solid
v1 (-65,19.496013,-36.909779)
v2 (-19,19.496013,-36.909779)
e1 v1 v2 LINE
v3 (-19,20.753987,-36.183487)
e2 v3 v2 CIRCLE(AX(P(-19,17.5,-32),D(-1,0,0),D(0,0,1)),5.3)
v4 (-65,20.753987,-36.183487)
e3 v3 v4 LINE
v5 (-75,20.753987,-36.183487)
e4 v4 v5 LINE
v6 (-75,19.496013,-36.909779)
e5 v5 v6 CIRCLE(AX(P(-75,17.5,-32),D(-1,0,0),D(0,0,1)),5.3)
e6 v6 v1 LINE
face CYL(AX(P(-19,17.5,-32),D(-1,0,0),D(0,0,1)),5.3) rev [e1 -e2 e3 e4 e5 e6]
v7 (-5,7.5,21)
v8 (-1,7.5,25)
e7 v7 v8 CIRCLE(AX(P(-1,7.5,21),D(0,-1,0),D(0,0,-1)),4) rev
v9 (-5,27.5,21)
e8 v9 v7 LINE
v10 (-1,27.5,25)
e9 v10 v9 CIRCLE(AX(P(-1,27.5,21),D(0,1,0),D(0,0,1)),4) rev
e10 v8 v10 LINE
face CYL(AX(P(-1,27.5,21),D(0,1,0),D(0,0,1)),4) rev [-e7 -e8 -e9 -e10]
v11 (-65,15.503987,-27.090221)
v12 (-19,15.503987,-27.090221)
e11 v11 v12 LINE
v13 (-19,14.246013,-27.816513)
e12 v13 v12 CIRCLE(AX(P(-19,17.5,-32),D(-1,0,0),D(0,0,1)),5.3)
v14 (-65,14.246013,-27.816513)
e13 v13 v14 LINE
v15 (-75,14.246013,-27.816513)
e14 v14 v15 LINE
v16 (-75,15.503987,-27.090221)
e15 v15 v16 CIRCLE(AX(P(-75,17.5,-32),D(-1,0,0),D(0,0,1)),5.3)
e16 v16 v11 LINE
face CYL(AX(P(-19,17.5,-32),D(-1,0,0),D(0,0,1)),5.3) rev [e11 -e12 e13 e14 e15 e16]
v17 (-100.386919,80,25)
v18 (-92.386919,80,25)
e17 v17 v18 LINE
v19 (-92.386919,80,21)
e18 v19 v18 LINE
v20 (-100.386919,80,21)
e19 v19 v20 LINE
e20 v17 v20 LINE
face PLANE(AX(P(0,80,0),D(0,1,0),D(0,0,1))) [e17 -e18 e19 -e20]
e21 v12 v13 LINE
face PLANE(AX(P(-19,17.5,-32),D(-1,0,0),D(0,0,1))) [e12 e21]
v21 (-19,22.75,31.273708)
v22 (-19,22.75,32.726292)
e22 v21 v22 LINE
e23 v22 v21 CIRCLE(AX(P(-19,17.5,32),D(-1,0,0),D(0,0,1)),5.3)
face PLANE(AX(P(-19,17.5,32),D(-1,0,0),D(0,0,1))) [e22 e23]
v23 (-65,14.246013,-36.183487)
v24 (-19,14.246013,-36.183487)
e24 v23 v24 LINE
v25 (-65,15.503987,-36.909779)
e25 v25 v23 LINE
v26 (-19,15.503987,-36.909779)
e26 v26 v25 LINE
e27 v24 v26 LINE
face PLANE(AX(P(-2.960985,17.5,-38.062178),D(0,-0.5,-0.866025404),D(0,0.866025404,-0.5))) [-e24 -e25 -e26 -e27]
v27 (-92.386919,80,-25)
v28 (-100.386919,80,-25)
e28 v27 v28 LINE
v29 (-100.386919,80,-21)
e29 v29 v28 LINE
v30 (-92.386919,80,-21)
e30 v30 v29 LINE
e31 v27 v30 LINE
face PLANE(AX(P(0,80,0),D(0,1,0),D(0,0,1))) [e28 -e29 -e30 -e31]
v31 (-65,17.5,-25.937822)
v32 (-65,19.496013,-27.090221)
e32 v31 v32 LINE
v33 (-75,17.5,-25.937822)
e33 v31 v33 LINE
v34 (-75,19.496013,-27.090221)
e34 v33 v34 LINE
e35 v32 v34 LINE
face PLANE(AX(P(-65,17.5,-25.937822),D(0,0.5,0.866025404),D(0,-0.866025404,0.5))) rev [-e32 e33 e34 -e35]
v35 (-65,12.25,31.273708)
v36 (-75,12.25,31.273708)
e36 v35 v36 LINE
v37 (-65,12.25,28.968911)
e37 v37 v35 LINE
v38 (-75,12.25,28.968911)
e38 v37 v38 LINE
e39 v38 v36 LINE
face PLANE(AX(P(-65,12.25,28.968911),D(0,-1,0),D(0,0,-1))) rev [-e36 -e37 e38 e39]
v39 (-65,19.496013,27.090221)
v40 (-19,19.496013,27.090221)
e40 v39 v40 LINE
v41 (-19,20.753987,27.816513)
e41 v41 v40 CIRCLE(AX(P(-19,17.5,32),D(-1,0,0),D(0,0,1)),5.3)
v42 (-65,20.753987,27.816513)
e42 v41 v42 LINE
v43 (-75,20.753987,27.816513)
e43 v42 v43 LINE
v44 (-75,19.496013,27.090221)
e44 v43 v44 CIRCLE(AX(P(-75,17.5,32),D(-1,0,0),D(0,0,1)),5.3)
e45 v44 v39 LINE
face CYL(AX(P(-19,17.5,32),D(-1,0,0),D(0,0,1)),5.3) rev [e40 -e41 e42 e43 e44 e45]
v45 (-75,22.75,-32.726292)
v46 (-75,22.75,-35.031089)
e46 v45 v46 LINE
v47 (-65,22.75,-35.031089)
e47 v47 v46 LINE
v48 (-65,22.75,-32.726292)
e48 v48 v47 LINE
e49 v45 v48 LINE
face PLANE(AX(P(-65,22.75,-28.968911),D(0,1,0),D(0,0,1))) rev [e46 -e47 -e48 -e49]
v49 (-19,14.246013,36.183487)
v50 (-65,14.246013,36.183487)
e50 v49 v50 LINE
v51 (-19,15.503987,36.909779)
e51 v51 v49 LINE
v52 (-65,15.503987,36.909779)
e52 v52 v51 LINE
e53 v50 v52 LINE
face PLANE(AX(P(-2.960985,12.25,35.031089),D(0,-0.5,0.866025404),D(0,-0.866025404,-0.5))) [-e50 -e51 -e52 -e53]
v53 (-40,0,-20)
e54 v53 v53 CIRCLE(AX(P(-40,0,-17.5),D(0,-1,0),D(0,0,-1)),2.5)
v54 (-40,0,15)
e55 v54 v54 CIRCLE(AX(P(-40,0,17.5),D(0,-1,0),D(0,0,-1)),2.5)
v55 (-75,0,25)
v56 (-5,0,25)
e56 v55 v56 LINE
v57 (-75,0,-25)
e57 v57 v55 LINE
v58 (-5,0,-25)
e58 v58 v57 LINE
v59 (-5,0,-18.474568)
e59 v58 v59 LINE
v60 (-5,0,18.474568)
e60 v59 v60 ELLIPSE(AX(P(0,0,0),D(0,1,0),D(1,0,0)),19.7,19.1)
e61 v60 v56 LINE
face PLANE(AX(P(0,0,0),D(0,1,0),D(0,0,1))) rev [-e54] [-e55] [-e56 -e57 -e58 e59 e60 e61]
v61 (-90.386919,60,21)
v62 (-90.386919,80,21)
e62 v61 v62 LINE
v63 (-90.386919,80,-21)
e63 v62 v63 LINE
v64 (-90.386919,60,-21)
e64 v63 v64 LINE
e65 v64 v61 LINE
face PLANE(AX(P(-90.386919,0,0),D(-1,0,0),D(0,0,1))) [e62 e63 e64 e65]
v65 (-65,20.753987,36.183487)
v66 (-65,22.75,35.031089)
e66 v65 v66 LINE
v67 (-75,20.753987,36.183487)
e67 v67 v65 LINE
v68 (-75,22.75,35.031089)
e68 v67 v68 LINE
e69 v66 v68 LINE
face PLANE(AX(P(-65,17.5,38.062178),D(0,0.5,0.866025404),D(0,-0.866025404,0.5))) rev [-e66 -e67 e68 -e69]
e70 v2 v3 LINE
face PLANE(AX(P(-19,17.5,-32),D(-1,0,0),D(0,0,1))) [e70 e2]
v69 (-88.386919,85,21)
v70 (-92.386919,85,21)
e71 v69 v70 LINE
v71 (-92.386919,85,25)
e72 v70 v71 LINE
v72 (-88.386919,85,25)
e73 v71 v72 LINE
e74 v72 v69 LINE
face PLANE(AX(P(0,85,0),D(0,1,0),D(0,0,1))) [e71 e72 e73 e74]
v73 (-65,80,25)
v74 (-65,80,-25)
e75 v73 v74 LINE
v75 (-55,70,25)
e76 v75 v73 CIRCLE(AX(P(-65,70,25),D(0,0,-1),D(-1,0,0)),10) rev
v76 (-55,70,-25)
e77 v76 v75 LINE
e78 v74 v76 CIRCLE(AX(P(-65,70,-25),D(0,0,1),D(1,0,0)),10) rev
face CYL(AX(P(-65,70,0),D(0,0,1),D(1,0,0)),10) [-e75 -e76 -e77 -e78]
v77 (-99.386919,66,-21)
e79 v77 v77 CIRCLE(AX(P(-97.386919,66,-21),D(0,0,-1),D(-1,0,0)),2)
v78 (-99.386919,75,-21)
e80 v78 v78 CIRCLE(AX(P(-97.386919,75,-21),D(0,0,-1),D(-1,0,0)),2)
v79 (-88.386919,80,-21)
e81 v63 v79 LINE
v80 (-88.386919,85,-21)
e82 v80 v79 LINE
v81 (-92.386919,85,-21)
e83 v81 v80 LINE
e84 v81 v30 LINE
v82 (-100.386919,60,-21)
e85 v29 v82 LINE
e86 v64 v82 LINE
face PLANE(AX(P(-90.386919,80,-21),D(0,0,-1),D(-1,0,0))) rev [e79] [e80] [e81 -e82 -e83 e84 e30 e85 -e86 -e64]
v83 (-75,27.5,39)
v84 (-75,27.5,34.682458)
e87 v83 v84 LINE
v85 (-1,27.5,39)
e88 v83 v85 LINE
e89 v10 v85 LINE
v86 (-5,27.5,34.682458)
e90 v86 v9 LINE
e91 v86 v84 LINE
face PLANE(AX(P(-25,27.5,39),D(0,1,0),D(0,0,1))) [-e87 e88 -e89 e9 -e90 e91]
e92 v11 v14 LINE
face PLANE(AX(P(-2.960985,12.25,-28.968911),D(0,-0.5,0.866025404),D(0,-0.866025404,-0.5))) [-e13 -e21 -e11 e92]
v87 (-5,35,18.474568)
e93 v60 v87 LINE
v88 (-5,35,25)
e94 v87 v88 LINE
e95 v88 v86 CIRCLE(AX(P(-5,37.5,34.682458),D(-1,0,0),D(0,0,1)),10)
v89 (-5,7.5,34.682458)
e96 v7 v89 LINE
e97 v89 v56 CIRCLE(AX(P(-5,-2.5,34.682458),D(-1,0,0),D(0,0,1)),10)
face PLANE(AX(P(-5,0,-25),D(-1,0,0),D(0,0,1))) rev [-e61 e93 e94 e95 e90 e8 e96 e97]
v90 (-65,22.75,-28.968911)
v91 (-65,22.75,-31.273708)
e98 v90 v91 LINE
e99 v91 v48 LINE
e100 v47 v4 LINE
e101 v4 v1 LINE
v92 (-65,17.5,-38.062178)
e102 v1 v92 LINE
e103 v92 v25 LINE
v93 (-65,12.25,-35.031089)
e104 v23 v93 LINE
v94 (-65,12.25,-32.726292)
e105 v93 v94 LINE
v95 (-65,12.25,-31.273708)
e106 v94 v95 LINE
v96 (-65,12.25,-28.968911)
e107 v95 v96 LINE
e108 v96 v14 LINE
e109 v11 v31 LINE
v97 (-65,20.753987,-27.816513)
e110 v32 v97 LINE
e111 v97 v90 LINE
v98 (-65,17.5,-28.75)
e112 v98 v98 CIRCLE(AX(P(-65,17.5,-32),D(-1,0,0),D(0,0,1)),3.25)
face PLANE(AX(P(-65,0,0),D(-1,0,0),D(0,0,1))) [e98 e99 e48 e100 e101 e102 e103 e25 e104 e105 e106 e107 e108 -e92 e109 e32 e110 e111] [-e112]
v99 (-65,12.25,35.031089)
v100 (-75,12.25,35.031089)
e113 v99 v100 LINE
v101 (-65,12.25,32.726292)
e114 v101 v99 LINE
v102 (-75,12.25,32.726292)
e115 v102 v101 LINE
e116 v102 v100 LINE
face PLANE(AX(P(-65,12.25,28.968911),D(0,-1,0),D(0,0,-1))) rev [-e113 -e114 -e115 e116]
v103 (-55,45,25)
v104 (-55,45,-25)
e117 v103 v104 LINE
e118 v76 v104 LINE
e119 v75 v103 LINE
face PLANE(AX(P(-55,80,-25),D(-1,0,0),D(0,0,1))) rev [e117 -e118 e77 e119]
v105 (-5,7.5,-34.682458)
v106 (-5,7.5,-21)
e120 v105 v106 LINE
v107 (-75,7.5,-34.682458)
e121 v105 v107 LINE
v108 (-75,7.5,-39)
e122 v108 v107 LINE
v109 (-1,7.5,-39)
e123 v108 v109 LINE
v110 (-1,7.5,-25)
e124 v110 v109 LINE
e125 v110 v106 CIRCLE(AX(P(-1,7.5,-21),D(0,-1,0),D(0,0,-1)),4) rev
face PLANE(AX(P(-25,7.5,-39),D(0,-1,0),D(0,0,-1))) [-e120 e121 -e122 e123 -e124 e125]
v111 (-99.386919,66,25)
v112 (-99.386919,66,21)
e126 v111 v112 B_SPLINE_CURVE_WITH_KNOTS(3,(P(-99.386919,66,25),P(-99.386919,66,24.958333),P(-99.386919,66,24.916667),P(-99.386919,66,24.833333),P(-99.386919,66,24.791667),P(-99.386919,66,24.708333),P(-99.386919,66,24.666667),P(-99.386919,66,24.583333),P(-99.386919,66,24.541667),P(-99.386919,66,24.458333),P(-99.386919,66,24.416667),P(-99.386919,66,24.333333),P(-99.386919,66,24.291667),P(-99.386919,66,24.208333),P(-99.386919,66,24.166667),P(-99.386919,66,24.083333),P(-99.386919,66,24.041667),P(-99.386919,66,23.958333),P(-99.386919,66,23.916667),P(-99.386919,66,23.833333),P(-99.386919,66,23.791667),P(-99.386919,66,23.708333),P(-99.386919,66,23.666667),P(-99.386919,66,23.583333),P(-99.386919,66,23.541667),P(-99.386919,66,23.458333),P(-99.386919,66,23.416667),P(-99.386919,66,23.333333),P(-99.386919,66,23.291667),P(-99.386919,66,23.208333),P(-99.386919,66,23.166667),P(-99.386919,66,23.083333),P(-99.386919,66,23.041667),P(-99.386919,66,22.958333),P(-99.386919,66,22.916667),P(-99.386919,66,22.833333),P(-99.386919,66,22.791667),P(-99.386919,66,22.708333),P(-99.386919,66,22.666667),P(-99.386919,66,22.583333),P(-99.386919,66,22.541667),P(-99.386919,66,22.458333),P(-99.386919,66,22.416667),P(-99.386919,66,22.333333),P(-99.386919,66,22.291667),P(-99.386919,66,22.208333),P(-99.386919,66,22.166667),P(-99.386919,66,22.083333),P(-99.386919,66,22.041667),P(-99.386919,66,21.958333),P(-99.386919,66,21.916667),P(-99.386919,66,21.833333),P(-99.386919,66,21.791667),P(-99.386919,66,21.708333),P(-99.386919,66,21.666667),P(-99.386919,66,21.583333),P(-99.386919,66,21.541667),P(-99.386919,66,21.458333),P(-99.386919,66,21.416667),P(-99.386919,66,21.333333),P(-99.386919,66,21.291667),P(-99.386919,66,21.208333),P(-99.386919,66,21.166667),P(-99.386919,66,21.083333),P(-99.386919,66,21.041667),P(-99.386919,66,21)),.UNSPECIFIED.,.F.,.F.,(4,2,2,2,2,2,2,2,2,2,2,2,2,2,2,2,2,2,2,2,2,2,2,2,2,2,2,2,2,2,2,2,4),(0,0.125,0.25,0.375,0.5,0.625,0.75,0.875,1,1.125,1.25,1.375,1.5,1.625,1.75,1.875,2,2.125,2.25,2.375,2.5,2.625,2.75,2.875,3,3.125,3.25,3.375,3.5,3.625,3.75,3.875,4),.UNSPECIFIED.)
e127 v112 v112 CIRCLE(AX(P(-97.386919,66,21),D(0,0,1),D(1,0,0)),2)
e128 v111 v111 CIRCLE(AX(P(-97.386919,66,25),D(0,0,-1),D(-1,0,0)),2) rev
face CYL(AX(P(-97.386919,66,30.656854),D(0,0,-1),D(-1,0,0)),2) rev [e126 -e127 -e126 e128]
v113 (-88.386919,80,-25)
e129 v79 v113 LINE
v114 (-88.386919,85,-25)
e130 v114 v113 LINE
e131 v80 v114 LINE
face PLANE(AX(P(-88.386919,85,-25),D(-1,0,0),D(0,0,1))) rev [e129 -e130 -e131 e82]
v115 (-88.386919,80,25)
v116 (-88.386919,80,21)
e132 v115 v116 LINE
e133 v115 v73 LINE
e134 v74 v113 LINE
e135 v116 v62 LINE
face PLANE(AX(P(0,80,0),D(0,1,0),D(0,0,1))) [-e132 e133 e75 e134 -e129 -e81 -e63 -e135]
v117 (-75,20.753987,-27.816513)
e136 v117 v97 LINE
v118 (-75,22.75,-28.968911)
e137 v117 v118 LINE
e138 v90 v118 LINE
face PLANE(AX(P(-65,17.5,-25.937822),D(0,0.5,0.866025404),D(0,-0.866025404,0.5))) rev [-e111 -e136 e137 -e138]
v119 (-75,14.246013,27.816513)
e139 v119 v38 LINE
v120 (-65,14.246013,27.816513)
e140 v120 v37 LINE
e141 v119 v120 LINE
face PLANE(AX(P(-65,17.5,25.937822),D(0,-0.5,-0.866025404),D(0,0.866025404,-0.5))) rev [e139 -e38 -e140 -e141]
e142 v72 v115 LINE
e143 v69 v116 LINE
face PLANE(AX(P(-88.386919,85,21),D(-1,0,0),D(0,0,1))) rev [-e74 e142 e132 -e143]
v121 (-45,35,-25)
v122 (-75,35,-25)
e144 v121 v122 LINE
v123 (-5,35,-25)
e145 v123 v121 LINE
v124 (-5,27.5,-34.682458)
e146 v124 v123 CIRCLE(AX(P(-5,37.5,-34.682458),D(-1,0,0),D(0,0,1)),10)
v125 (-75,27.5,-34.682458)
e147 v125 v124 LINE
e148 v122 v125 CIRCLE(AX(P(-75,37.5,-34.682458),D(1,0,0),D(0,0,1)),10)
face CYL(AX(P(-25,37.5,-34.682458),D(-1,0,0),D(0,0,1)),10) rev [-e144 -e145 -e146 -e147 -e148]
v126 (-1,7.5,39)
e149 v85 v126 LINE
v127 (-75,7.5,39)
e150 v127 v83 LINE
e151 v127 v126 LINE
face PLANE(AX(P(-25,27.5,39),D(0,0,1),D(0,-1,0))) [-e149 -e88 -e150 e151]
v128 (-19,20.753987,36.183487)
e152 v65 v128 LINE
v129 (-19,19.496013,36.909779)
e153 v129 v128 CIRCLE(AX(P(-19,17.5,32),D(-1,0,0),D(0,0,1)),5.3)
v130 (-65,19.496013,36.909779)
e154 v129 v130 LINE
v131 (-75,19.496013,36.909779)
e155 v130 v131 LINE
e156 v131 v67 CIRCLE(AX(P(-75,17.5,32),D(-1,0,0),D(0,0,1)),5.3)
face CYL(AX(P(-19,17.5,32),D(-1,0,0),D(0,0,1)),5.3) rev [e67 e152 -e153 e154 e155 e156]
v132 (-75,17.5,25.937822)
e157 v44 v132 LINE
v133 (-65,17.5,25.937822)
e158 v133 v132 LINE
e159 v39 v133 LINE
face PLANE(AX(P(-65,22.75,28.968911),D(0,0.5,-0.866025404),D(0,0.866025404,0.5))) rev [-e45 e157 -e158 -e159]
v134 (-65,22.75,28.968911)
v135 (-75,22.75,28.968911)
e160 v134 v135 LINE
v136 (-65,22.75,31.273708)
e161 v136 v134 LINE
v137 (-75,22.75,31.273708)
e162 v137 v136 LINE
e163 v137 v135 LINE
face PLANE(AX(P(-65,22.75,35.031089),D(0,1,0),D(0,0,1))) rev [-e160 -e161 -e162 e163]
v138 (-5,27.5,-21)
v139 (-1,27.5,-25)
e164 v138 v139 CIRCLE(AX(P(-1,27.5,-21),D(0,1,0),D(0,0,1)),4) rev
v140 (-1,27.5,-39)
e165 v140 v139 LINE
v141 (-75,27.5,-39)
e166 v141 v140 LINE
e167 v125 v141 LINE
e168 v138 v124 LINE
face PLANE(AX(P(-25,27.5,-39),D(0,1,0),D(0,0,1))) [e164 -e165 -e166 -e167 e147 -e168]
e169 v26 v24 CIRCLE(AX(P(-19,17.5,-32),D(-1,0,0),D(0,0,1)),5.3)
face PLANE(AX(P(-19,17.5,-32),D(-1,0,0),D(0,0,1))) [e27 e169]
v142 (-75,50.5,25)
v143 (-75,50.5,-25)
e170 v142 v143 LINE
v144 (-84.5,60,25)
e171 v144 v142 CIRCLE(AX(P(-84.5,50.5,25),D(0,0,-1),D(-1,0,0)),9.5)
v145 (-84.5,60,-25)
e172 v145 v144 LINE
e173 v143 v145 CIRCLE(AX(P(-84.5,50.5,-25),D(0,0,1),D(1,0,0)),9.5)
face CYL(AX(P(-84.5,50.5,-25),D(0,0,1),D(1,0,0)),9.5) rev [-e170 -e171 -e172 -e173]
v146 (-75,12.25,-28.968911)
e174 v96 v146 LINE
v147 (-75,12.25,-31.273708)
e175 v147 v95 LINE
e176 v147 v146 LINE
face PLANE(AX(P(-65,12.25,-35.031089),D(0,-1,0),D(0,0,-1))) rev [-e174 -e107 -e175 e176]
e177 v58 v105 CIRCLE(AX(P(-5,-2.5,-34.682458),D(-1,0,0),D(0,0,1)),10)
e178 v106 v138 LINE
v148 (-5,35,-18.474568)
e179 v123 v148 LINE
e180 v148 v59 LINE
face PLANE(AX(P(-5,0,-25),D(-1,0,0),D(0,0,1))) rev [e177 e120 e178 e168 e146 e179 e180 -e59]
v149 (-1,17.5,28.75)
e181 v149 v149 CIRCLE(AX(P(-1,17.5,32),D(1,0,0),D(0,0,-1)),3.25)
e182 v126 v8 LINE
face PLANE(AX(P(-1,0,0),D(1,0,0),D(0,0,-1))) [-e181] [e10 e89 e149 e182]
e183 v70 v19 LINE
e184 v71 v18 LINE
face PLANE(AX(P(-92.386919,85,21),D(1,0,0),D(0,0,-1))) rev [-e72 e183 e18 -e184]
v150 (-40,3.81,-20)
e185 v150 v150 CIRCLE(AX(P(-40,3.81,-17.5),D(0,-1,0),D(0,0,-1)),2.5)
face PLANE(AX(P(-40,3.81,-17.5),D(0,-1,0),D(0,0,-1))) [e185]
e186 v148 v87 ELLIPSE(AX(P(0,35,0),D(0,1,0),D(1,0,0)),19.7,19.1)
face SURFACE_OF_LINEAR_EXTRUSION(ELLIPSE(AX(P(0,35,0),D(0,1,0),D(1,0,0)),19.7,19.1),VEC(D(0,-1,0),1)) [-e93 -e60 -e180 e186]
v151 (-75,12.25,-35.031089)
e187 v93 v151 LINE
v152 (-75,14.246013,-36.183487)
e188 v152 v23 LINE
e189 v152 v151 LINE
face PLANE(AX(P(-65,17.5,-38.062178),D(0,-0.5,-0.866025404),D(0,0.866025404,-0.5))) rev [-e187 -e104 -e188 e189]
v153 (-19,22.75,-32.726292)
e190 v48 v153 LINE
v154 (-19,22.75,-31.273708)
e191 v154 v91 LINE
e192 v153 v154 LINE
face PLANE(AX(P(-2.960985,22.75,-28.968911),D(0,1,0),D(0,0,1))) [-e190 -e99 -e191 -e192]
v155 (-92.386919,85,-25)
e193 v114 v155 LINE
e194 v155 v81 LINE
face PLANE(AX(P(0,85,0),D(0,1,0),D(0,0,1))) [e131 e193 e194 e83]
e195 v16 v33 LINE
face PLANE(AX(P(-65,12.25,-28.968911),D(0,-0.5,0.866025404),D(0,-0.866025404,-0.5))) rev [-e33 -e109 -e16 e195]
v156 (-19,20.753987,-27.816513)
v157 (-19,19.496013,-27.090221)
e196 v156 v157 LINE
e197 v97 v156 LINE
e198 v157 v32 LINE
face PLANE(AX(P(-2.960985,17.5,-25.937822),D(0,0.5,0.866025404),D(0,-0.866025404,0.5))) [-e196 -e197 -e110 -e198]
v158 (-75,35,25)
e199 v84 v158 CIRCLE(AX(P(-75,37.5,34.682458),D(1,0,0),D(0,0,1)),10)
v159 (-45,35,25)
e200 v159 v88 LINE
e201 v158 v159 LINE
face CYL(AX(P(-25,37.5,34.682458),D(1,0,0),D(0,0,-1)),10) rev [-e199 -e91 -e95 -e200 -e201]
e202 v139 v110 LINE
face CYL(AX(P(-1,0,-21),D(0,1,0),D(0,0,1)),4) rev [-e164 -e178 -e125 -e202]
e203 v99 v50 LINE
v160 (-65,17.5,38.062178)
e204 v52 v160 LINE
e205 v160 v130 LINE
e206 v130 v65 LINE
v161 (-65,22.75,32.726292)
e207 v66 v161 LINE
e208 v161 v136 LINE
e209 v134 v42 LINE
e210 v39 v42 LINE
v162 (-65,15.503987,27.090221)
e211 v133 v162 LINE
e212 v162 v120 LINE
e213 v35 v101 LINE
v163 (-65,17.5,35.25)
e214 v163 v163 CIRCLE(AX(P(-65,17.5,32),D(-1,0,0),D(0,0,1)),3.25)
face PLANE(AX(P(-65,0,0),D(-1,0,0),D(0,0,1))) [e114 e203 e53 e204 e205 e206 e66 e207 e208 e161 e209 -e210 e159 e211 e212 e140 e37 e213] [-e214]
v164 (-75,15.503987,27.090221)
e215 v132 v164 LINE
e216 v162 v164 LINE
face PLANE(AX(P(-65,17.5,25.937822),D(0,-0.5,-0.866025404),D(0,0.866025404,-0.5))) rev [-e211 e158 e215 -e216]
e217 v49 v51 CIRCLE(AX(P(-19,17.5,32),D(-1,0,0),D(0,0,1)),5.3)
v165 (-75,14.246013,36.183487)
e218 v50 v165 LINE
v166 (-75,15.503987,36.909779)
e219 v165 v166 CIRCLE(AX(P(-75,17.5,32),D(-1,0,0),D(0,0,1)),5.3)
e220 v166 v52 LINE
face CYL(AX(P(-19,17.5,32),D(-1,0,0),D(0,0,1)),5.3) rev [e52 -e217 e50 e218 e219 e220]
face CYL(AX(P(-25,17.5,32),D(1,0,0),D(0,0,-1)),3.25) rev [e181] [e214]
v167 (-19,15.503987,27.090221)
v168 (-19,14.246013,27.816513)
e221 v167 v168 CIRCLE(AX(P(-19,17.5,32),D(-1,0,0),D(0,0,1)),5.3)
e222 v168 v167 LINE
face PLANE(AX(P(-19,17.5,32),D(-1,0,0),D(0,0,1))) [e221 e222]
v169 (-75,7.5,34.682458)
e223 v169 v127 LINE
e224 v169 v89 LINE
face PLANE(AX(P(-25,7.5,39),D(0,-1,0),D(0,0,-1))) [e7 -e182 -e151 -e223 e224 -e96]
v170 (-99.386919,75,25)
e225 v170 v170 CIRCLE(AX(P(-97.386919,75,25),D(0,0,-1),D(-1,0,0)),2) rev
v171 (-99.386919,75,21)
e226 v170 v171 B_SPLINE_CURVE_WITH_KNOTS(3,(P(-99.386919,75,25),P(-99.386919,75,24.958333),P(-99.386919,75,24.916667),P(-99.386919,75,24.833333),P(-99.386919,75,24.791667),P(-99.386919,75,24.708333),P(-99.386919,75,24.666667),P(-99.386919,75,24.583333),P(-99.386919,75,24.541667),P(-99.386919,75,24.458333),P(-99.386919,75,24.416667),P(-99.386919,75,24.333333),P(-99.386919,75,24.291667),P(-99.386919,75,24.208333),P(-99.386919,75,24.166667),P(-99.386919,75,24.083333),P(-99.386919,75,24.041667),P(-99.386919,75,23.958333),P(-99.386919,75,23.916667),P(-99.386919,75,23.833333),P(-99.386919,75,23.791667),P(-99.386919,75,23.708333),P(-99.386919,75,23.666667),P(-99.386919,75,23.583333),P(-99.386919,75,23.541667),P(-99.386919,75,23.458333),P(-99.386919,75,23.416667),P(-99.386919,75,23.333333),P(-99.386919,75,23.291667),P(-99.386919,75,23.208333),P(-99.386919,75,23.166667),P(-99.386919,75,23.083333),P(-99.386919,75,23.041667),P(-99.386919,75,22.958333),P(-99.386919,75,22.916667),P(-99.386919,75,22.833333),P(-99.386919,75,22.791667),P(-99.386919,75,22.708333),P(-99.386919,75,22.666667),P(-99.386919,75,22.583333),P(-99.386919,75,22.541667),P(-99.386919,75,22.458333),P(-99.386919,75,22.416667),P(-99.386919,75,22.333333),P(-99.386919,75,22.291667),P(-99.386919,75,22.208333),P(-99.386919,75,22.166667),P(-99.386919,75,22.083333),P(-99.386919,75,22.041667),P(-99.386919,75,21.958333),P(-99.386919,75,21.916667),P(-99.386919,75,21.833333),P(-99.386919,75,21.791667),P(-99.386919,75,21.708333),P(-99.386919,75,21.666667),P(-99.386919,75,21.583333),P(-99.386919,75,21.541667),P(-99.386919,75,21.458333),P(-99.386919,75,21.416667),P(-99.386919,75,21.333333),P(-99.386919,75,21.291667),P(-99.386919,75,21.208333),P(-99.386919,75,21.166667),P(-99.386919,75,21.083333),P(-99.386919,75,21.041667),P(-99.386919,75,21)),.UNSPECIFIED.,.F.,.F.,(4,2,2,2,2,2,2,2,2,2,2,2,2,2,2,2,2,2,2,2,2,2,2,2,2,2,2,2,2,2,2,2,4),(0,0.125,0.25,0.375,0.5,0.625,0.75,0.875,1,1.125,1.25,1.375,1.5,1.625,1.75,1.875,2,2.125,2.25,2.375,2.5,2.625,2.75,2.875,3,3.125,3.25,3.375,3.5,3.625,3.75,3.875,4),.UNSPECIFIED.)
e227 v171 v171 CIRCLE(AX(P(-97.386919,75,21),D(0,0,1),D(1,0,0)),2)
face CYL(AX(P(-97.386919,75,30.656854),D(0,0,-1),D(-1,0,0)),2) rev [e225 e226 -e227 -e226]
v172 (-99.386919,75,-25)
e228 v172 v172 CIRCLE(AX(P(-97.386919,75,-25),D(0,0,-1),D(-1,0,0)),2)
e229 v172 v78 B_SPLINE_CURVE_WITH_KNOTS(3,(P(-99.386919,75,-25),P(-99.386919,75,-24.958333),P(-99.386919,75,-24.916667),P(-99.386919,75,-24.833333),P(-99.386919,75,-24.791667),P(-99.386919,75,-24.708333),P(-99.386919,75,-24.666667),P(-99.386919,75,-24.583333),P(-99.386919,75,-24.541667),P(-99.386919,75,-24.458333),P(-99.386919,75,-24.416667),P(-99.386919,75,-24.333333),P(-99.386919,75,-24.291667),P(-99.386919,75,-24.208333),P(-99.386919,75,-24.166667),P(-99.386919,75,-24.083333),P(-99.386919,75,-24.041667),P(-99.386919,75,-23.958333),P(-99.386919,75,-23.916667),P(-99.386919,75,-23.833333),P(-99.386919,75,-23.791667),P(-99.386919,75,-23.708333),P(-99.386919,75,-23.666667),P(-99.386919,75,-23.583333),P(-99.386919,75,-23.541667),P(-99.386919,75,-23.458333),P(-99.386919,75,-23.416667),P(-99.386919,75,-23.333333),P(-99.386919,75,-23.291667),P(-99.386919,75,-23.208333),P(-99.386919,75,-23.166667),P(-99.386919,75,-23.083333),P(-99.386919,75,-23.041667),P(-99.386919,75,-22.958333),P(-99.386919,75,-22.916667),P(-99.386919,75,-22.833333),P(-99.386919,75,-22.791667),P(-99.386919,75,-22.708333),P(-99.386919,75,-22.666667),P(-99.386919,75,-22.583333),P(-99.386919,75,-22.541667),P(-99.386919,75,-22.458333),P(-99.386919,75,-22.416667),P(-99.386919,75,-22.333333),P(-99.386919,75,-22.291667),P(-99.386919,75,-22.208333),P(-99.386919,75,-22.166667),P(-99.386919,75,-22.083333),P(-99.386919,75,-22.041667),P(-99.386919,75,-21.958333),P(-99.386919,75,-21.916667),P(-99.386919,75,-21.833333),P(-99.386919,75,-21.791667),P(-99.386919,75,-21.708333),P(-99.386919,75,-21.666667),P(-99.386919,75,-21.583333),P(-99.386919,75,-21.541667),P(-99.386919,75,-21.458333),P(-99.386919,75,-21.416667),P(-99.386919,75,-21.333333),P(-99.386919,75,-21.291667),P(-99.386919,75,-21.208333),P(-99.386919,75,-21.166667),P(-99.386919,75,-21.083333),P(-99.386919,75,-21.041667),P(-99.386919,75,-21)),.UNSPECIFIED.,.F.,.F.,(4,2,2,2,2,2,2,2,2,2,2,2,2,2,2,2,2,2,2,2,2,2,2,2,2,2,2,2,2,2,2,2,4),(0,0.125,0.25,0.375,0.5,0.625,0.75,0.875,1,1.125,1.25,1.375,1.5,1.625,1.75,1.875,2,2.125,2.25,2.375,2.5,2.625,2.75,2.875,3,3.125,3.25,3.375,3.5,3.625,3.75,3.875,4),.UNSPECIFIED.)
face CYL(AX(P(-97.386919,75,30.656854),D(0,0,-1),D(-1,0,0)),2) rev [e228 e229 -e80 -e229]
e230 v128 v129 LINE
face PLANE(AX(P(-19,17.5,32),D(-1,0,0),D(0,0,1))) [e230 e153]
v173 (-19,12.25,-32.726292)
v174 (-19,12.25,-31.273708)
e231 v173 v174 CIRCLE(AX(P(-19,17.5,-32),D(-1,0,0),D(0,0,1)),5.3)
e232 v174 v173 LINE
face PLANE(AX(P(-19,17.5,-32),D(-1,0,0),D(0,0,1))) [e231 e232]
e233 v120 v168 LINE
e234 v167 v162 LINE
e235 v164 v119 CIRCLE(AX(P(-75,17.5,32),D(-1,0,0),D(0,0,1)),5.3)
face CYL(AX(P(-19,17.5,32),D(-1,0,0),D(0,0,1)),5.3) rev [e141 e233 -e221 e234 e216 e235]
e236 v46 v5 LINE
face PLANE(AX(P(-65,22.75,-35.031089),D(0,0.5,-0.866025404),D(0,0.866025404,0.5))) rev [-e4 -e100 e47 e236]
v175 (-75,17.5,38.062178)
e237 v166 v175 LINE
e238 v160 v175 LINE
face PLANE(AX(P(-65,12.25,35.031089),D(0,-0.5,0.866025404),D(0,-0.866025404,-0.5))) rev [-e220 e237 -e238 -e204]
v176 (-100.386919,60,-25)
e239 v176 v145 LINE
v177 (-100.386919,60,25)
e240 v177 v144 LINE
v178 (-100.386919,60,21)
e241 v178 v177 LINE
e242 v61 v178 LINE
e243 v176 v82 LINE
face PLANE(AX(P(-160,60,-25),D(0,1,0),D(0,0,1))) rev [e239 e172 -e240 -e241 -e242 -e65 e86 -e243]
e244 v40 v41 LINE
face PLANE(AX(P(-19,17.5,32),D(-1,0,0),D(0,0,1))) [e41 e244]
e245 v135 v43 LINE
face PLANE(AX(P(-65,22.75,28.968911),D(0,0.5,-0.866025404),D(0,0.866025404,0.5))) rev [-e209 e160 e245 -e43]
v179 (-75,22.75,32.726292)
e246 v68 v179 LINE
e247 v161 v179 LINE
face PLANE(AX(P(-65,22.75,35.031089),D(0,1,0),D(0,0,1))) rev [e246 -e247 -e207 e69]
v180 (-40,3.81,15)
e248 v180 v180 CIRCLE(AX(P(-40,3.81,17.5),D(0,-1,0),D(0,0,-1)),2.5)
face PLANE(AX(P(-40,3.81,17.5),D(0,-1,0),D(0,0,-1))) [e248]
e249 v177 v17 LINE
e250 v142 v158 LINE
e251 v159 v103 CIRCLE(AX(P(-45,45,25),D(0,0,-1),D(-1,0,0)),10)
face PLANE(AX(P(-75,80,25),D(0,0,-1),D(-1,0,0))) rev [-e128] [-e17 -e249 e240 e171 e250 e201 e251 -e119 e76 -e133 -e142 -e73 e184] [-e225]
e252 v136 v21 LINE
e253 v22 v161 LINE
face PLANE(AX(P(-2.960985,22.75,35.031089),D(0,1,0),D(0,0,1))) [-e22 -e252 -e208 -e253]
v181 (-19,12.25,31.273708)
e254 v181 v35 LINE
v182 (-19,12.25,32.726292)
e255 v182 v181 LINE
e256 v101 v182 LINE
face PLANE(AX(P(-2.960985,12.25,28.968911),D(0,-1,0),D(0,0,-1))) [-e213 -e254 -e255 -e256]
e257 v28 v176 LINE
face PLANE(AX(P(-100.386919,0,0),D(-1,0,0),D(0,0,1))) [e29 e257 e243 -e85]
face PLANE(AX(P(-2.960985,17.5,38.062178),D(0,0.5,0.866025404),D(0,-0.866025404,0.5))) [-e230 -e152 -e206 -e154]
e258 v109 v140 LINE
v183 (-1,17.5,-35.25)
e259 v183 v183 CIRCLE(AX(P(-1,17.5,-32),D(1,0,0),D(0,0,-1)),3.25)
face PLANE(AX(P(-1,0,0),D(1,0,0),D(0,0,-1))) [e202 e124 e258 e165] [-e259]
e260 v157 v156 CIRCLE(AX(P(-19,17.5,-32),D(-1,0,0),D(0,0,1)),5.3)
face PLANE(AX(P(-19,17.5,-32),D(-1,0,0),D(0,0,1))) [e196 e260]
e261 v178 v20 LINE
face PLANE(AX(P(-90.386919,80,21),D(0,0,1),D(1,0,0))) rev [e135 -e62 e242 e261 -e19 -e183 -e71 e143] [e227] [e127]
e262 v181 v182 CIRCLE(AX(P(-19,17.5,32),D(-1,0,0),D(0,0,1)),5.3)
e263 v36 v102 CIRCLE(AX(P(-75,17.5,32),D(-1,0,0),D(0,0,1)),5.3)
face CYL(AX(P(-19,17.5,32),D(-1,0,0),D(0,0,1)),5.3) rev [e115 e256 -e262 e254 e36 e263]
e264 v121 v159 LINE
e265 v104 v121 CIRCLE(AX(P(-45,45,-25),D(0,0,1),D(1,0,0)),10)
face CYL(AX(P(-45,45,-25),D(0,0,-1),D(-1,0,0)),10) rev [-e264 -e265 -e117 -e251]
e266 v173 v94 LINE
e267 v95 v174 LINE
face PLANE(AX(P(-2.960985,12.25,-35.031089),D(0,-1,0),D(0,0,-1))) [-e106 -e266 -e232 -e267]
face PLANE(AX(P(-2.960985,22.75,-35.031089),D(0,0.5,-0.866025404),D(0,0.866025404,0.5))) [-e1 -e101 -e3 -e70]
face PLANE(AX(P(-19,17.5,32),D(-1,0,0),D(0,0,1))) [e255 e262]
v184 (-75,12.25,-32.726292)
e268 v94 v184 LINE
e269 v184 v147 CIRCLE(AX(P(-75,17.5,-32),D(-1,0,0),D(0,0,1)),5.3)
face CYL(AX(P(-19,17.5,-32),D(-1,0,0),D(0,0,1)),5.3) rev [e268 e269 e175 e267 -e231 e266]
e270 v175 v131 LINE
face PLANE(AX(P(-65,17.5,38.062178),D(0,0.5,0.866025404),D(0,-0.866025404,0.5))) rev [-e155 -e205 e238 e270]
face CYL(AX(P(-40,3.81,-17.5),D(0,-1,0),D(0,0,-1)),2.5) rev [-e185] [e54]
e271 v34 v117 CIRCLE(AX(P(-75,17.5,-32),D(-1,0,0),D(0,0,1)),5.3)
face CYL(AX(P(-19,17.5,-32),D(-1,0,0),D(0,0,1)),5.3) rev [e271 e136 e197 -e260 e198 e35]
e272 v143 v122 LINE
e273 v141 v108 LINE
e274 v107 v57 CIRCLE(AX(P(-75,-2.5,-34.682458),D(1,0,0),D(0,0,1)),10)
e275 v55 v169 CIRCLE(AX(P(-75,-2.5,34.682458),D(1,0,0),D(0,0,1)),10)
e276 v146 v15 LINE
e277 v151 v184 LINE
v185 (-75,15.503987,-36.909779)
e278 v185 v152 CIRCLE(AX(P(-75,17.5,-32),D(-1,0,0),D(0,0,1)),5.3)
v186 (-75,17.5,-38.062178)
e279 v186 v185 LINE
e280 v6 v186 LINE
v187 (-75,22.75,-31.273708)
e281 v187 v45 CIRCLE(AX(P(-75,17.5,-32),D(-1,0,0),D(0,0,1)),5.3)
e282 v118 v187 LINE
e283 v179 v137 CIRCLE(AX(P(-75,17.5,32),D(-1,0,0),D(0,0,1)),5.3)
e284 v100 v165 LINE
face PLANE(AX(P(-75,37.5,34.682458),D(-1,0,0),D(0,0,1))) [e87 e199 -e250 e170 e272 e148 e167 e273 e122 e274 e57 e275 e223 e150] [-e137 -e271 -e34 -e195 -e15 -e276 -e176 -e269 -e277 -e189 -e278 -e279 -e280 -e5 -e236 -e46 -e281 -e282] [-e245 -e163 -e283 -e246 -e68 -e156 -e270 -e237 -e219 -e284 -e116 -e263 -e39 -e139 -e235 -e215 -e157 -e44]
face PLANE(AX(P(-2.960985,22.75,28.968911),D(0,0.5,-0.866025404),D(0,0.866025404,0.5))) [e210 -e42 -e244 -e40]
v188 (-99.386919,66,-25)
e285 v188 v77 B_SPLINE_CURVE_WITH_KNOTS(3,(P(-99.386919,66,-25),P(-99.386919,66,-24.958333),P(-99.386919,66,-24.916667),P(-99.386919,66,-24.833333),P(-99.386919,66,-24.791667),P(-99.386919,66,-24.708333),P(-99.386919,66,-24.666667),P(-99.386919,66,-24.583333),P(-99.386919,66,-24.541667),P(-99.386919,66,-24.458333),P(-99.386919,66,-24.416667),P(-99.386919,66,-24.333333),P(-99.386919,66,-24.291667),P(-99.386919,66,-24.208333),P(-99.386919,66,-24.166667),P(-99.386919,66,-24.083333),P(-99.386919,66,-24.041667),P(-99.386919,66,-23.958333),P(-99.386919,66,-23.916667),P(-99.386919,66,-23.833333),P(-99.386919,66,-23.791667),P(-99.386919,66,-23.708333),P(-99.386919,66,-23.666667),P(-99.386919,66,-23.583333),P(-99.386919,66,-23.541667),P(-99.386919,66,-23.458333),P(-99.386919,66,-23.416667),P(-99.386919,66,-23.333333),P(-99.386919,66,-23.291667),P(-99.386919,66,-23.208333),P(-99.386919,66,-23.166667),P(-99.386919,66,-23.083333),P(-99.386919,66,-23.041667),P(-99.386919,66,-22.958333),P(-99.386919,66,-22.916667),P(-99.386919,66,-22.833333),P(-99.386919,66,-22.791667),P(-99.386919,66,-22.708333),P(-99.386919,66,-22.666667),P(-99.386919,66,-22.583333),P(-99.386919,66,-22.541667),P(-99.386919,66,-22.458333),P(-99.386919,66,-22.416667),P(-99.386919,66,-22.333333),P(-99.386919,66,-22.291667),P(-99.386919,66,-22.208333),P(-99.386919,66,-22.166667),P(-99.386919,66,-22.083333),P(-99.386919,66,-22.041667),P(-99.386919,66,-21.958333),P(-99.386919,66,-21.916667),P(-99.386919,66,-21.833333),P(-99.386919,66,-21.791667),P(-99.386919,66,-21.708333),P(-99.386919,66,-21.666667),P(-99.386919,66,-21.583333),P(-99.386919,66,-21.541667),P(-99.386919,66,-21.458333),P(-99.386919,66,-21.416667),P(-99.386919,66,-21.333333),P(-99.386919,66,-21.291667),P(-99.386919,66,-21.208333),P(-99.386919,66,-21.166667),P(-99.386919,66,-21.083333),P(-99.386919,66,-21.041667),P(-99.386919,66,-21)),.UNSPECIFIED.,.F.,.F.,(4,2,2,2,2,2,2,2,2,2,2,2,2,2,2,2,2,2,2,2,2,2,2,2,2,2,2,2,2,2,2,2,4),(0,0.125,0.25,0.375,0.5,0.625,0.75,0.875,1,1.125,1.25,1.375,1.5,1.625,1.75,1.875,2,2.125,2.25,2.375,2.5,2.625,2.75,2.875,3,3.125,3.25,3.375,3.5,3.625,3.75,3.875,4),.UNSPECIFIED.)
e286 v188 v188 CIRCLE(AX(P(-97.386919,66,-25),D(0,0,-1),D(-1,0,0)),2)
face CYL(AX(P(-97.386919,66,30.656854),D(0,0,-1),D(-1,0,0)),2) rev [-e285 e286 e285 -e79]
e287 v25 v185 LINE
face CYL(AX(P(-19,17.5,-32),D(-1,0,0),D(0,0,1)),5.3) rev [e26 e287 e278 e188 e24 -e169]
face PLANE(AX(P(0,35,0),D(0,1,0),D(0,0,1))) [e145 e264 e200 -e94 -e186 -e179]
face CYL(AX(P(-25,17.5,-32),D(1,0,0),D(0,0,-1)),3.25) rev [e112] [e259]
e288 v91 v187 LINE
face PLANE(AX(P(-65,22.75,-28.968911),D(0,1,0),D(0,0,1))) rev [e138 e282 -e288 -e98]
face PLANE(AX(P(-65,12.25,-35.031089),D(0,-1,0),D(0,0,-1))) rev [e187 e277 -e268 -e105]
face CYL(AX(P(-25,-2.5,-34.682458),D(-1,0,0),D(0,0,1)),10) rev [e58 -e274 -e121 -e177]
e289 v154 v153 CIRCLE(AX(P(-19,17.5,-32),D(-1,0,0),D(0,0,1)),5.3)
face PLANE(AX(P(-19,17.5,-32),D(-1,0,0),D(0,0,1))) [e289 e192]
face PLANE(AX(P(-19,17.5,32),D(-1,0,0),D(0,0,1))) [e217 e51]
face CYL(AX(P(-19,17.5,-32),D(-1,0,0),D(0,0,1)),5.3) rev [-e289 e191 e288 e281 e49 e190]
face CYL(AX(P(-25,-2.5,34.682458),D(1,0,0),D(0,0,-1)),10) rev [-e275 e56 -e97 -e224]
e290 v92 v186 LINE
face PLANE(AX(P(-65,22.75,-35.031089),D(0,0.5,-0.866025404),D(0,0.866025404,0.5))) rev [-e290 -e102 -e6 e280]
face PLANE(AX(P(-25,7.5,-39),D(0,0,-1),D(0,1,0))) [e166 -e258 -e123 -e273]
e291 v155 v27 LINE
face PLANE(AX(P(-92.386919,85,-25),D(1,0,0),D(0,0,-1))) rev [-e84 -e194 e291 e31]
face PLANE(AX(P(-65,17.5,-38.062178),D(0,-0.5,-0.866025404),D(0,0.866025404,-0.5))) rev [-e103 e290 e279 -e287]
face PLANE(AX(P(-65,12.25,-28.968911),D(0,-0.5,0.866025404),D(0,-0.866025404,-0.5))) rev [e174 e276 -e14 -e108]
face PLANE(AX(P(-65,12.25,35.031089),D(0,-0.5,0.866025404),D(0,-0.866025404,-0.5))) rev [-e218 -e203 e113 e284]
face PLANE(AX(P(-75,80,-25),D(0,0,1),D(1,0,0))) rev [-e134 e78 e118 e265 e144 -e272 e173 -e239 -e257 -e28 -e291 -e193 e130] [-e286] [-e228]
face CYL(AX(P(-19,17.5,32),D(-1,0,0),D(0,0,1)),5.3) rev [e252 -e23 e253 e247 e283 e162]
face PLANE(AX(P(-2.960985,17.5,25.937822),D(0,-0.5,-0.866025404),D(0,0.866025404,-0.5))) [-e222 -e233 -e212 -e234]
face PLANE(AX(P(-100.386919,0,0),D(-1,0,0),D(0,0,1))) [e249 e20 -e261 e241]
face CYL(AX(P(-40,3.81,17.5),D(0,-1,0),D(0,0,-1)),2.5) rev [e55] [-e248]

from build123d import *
from build123d.topology import SkipClean

# Parameters (mm, degrees)
SKETCH1_W                = 50
SKETCH1_H                = 50
SKETCH1_RX               = 19.7
SKETCH1_RY               = 19.1
BOSS_EXTRUDE1_DEPTH      = 35
SKETCH2_W                = 30
SKETCH2_H                = 50
CUT_EXTRUDE1_DEPTH       = 35
SKETCH3_W                = 13
SKETCH3_H                = 50
BOSS_EXTRUDE2_DEPTH      = 20
SKETCH4_R                = 1.5
CUT_EXTRUDE2_DEPTH       = 64.639610377
SKETCH5_W                = 36.974567712
SKETCH5_H                = 20
CUT_EXTRUDE3_DEPTH       = 20
BOSS_EXTRUDE3_DEPTH      = 4
BOSS_EXTRUDE3_DEPTH_BACK = 20
SKETCH6_W                = 14
SKETCH6_H                = 20
SKETCH6_R                = 3.25
SKETCH7_R                = 5.3
SKETCH7_R_2              = 3
CUT_EXTRUDE4_DEPTH       = 6
SKETCH8_W                = 13
SKETCH8_H                = 13.025432288
CUT_EXTRUDE5_DEPTH       = 30
FILLET6_R                = 4
FILLET5_R                = 10
SKETCH9_R                = 5.3
BOSS_EXTRUDE4_DEPTH      = 50
SKETCH10_W               = 20
SKETCH10_H               = 50
BOSS_EXTRUDE5_DEPTH      = 45
FILLET7_R                = 10
SKETCH11_W               = 50
SKETCH11_H               = 20
BOSS_EXTRUDE6_DEPTH      = 85
FILLET8_R                = 9.5
SKETCH13_R               = 37.5
BOSS_EXTRUDE7_DEPTH      = 20
CUT_EXTRUDE6_DEPTH       = 85
FILLET9_R                = 10
FILLET10_R               = 10
SKETCH14_R               = 3.25
CUT_EXTRUDE7_DEPTH       = 85
SKETCH15_R               = 5.3
CUT_EXTRUDE8_DEPTH       = 7
SKETCH16_R               = 3.25
BOSS_EXTRUDE9_DEPTH      = 56
SKETCH16_3_R             = 3.25
CUT_EXTRUDE11_DEPTH      = 10
SKETCH17_W               = 75
SKETCH17_H               = 20
CUT_EXTRUDE12_DEPTH      = 69.613081
SKETCH19_W               = 50
SKETCH19_H               = 20
BOSS_EXTRUDE10_DEPTH     = 10
SKETCH20_W               = 42
SKETCH20_H               = 20
CUT_EXTRUDE14_DEPTH      = 10
CUT_EXTRUDE15_REACH      = 145.435
SKETCH21_R               = 2
SKETCH22_W               = 4
SKETCH22_H               = 4
BOSS_EXTRUDE11_DEPTH     = 5
SKETCH25_R               = 2.5
CUT_EXTRUDE16_DEPTH      = 3.81


# Some blends are built 0.0001 mm under size
with BuildPart() as part:
    # Sketch1 → Boss-Extrude1 (new body)
    with BuildSketch(Plane(origin=(0, 0, 0), x_dir=(1, 0, 0), z_dir=(0, 1, 0))):
        Rectangle(SKETCH1_W, SKETCH1_H)
        with Locations((0, 0)):
            Ellipse(SKETCH1_RX, SKETCH1_RY, mode=Mode.SUBTRACT)
    extrude(amount=BOSS_EXTRUDE1_DEPTH)

    # Sketch2 → Cut-Extrude1 (cut)
    with BuildSketch(Plane(origin=(0, 35, 0), x_dir=(1, 0, 0), z_dir=(0, 1, 0))):
        with Locations((10, 0)):
            Rectangle(SKETCH2_W, SKETCH2_H)
    extrude(amount=-CUT_EXTRUDE1_DEPTH, mode=Mode.SUBTRACT)

    # Sketch3 → Boss-Extrude2 (add)
    with BuildSketch(Plane(origin=(0, 35, 0), x_dir=(1, 0, 0), z_dir=(0, 1, 0))):
        with Locations((-18.5, 0)):
            Rectangle(SKETCH3_W, SKETCH3_H)
    extrude(amount=BOSS_EXTRUDE2_DEPTH)

    # Sketch4 → Cut-Extrude2 (cut, through all)
    with BuildSketch(Plane.ZY.offset(25)):
        with Locations((18.474567712, 50)):
            Circle(SKETCH4_R)
    extrude(amount=-CUT_EXTRUDE2_DEPTH, mode=Mode.SUBTRACT)

    # Sketch5 → Cut-Extrude3 (cut)
    with BuildSketch(Plane(origin=(-12, 55, -25), x_dir=(0, 0, 1), z_dir=(-1, 0, 0))):
        with Locations((18.487283856, -10)):
            Rectangle(SKETCH5_W, SKETCH5_H)
    extrude(amount=CUT_EXTRUDE3_DEPTH, mode=Mode.SUBTRACT)

    # Sketch6 → Boss-Extrude3 (add, two sides: drawn at the far end of the back side and taken through both)
    # profile 1 of 2: a face of its own
    with BuildSketch(Plane(origin=(-5, 0, 0), x_dir=(0, 0, -1), z_dir=(1, 0, 0)).offset(-BOSS_EXTRUDE3_DEPTH_BACK)):
        with Locations((-32, 17.5)):
            Rectangle(SKETCH6_W, SKETCH6_H)
        with Locations((-32, 17.5)):
            Circle(SKETCH6_R, mode=Mode.SUBTRACT)
    # profile 2 of 2: a face of its own
    with BuildSketch(Plane(origin=(-5, 0, 0), x_dir=(0, 0, -1), z_dir=(1, 0, 0)).offset(-BOSS_EXTRUDE3_DEPTH_BACK)):
        with Locations((32, 17.5)):
            Rectangle(SKETCH6_W, SKETCH6_H)
        with Locations((32, 17.5)):
            Circle(SKETCH6_R, mode=Mode.SUBTRACT)
    extrude(amount=BOSS_EXTRUDE3_DEPTH + BOSS_EXTRUDE3_DEPTH_BACK)

    # Sketch7 → Cut-Extrude4 (cut)
    with BuildSketch(Plane.ZY.offset(25)):
        with Locations((-32, 17.5)):
            Circle(SKETCH7_R)
        with Locations((32, 17.5)):
            Circle(SKETCH7_R)
        with Locations((18.474567712, 50)):
            Circle(SKETCH7_R_2)
    extrude(amount=-CUT_EXTRUDE4_DEPTH, mode=Mode.SUBTRACT)

    # Sketch8 → Cut-Extrude5 (cut)
    with BuildSketch(Plane(origin=(0, 35, 0), x_dir=(1, 0, 0), z_dir=(0, 1, 0))):
        with Locations((-18.5, -18.487283856)):
            Rectangle(SKETCH8_W, SKETCH8_H)
    extrude(amount=CUT_EXTRUDE5_DEPTH, mode=Mode.SUBTRACT)

    # Fillet6
    fillet6_edges = [part.edges().sort_by_distance(p)[0] for p in [
        (-5, 17.5, 25),
        (-5, 17.5, -25),
    ]]
    fillet(fillet6_edges, radius=FILLET6_R - 0.0001)  # a hair under: the kernel refuses the full size

    # Fillet5
    # the kernel refuses this fillet: 10 mm, written as the material it adds along each edge
    with BuildSketch(Plane(origin=(-5, 7.5, 25), x_dir=(0, -1, 0), z_dir=(-1, 0, 0))) as fillet5_piece_1:
        with BuildLine():
            CenterArc((10, 9.682458366), FILLET5_R, 180, 75.522487814)
            Line((0, 9.682458366), (0, 0))
            Line((0, 0), (7.5, 0))
        make_face()
    extrude(amount=20)
    with BuildSketch(Plane(origin=(-5, 27.5, 25), x_dir=(0, 0, 1), z_dir=(-1, 0, 0)), Plane(origin=(-5, 7.5, -25), x_dir=(0, 0, -1), z_dir=(-1, 0, 0))) as fillet5_piece_2:
        with BuildLine():
            CenterArc((9.682458366, 10), FILLET5_R, 194.477512186, 75.522487814)
            Line((0, 7.5), (0, 0))
            Line((0, 0), (9.682458366, 0))
        make_face()
    extrude(amount=20)
    with BuildSketch(Plane(origin=(-5, 27.5, -25), x_dir=(0, 0, -1), z_dir=(-1, 0, 0))) as fillet5_piece_3:
        with BuildLine():
            CenterArc((9.682458366, -10), FILLET5_R, 90, 75.522487814)
            Line((0, -7.5), (0, 0))
            Line((0, 0), (9.682458366, 0))
        make_face()
    extrude(amount=20)

    # Sketch9 → Boss-Extrude4 (add)
    with BuildSketch(Plane.ZY.offset(25)):
        with BuildLine():
            Line((39, 27.5), (34.682458366, 27.5))
            ThreePointArc((34.682458366, 27.5), (28.558734009, 29.59430585), (25, 35))
            Line((25, 35), (-25, 35))
            ThreePointArc((-25, 35), (-28.558734009, 29.59430585), (-34.682458366, 27.5))
            Line((-34.682458366, 27.5), (-39, 27.5))
            Line((-39, 27.5), (-39, 7.5))
            Line((-39, 7.5), (-34.682458366, 7.5))
            ThreePointArc((-34.682458366, 7.5), (-28.558734009, 5.40569415), (-25, 0))
            Line((-25, 0), (25, 0))
            ThreePointArc((25, 0), (28.558734009, 5.40569415), (34.682458366, 7.5))
            Line((34.682458366, 7.5), (39, 7.5))
            Line((39, 7.5), (39, 27.5))
        make_face()
        with Locations((32, 17.5)):
            Circle(SKETCH9_R, mode=Mode.SUBTRACT)
        with Locations((-32, 17.5)):
            Circle(SKETCH9_R, mode=Mode.SUBTRACT)
    extrude(amount=BOSS_EXTRUDE4_DEPTH)

    # Sketch10 → Boss-Extrude5 (add)
    with SkipClean():  # the faces are left unmerged after this step: merging them gives an invalid solid
        with BuildSketch(Plane(origin=(0, 35, 0), x_dir=(1, 0, 0), z_dir=(0, 1, 0))):
            with Locations((-65, 0)):
                Rectangle(SKETCH10_W, SKETCH10_H)
        extrude(amount=BOSS_EXTRUDE5_DEPTH)

    # Fillet7
    fillet7_edges = [part.edges().sort_by_distance(p)[0] for p in [
        (-55, 35, 0),
    ]]
    fillet(fillet7_edges, radius=FILLET7_R)

    # Sketch11 → Boss-Extrude6 (add)
    with SkipClean():  # the faces are left unmerged after this step: merging them gives an invalid solid
        with BuildSketch(Plane.ZY.offset(75)):
            with Locations((0, 70)):
                Rectangle(SKETCH11_W, SKETCH11_H)
        extrude(amount=BOSS_EXTRUDE6_DEPTH)

    # Fillet8
    fillet8_edges = [part.edges().sort_by_distance(p)[0] for p in [
        (-75, 60, 0),
    ]]
    fillet(fillet8_edges, radius=FILLET8_R)

    # Sketch13 → Boss-Extrude7 (add)
    with SkipClean():  # the faces are left unmerged after this step: merging them gives an invalid solid
        with BuildSketch(Plane(origin=(0, 80, 0), x_dir=(1, 0, 0), z_dir=(0, 1, 0))):
            with Locations((-122.5, 0)):
                Circle(SKETCH13_R)
        extrude(amount=-BOSS_EXTRUDE7_DEPTH)

    # Sketch13<3> → Cut-Extrude6 (cut)
    with SkipClean():  # the faces are left unmerged after this step: merging them gives an invalid solid
        with BuildSketch(Plane(origin=(0, 80, 0), x_dir=(1, 0, 0), z_dir=(0, 1, 0))):
            with BuildLine():
                ThreePointArc((-150.450849719, -25), (-157.531463446, -13.380828406), (-160, -8.4e-08))
                Line((-160, -8.4e-08), (-160, -25))
                Line((-160, -25), (-150.450849719, -25))
            make_face()
            with BuildLine():
                Line((-150.450849719, 25), (-160, 25))
                Line((-160, 25), (-160, -8.4e-08))
                ThreePointArc((-160, -8.4e-08), (-157.531463476, 13.380828327), (-150.450849719, 25))
            make_face()
        extrude(amount=-CUT_EXTRUDE6_DEPTH, mode=Mode.SUBTRACT)

    # Fillet9
    fillet9_edges = [part.edges().sort_by_distance(p)[0] for p in [
        (-94.549150281, 70, 25),
        (-94.549150281, 70, -25),
    ]]
    fillet(fillet9_edges, radius=FILLET9_R)

    # Fillet10
    fillet10_edges = [part.edges().sort_by_distance(p)[0] for p in [
        (-55, 80, 0),
    ]]
    fillet(fillet10_edges, radius=FILLET10_R)

    # Sketch14 → Cut-Extrude7 (cut)
    with SkipClean():  # the faces are left unmerged after this step: merging them gives an invalid solid
        with BuildSketch(Plane(origin=(0, 80, 0), x_dir=(1, 0, 0), z_dir=(0, 1, 0))):
            with Locations(Location((-140.17766953, 17.67766953, 0), (0, 0, 270))):
                Circle(SKETCH14_R)
            with Locations(Location((-140.17766953, -17.67766953, 0), (0, 0, 270))):
                Circle(SKETCH14_R)
            with Locations(Location((-104.82233047, -17.67766953, 0), (0, 0, 270))):
                Circle(SKETCH14_R)
            with Locations(Location((-104.82233047, 17.67766953, 0), (0, 0, 270))):
                Circle(SKETCH14_R)
        extrude(amount=-CUT_EXTRUDE7_DEPTH, mode=Mode.SUBTRACT)

    # Sketch15 → Cut-Extrude8 (cut)
    with SkipClean():  # the faces are left unmerged after this step: merging them gives an invalid solid
        with BuildSketch(Plane(origin=(0, 80, 0), x_dir=(1, 0, 0), z_dir=(0, 1, 0))):
            with Locations(Location((-140.17766953, 17.67766953, 0), (0, 0, 270))):
                Circle(SKETCH15_R)
            with Locations(Location((-140.17766953, -17.67766953, 0), (0, 0, 270))):
                Circle(SKETCH15_R)
            with Locations(Location((-104.82233047, -17.67766953, 0), (0, 0, 270))):
                Circle(SKETCH15_R)
            with Locations(Location((-104.82233047, 17.67766953, 0), (0, 0, 270))):
                Circle(SKETCH15_R)
        extrude(amount=-CUT_EXTRUDE8_DEPTH, mode=Mode.SUBTRACT)

    # Sketch16 → Boss-Extrude9 (add)
    # profile 1 of 2: a face of its own
    with SkipClean():  # the faces are left unmerged after this step: merging them gives an invalid solid
        with BuildSketch(Plane.ZY.offset(75)):
            Polygon((-25.937822174, 17.5), (-28.968911087, 22.75), (-35.031088913, 22.75), (-38.062177826, 17.5), (-35.031088913, 12.25), (-28.968911087, 12.25), align=None)
            with Locations(Location((-32, 17.5, 0), (0, 0, 180))):
                Circle(SKETCH16_R, mode=Mode.SUBTRACT)
        # profile 2 of 2: a face of its own
        with BuildSketch(Plane.ZY.offset(75)):
            Polygon((25.937822174, 17.5), (28.968911087, 12.25), (35.031088913, 12.25), (38.062177826, 17.5), (35.031088913, 22.75), (28.968911087, 22.75), align=None)
            with Locations(Location((32, 17.5, 0), (0, 0, 180))):
                Circle(SKETCH16_R, mode=Mode.SUBTRACT)
        extrude(amount=-BOSS_EXTRUDE9_DEPTH)

    # Sketch16<3> → Cut-Extrude11 (cut)
    # profile 1 of 2: a face of its own
    with SkipClean():  # the faces are left unmerged after this step: merging them gives an invalid solid
        with BuildSketch(Plane.ZY.offset(75)):
            Polygon((-25.937822174, 17.5), (-28.968911087, 22.75), (-35.031088913, 22.75), (-38.062177826, 17.5), (-35.031088913, 12.25), (-28.968911087, 12.25), align=None)
            with Locations(Location((-32, 17.5, 0), (0, 0, 180))):
                Circle(SKETCH16_3_R, mode=Mode.SUBTRACT)
        # profile 2 of 2: a face of its own
        with BuildSketch(Plane.ZY.offset(75)):
            Polygon((25.937822174, 17.5), (28.968911087, 12.25), (35.031088913, 12.25), (38.062177826, 17.5), (35.031088913, 22.75), (28.968911087, 22.75), align=None)
            with Locations(Location((32, 17.5, 0), (0, 0, 180))):
                Circle(SKETCH16_3_R, mode=Mode.SUBTRACT)
        extrude(amount=-CUT_EXTRUDE11_DEPTH, mode=Mode.SUBTRACT)

    # Sketch17 → Cut-Extrude12 (cut)
    with SkipClean():  # the faces are left unmerged after this step: merging them gives an invalid solid
        with BuildSketch(Plane.ZY.offset(160)):
            with Locations((0, 70)):
                Rectangle(SKETCH17_W, SKETCH17_H)
        extrude(amount=-CUT_EXTRUDE12_DEPTH, mode=Mode.SUBTRACT)

    # Sketch19 → Boss-Extrude10 (add)
    with SkipClean():  # the faces are left unmerged after this step: merging them gives an invalid solid
        with BuildSketch(Plane.ZY.offset(90.386918553)):
            with Locations((0, 70)):
                Rectangle(SKETCH19_W, SKETCH19_H)
        extrude(amount=BOSS_EXTRUDE10_DEPTH)

    # Sketch20 → Cut-Extrude14 (cut)
    with SkipClean():  # the faces are left unmerged after this step: merging them gives an invalid solid
        with BuildSketch(Plane.ZY.offset(100.386918553)):
            with Locations((0, 70)):
                Rectangle(SKETCH20_W, SKETCH20_H)
        extrude(amount=-CUT_EXTRUDE14_DEPTH, mode=Mode.SUBTRACT)

    # Cut-Extrude15: up to this face of the body (flat: up to its plane)
    cut_extrude15_end = Plane(part.part.faces().sort_by_distance((-64.8934774, 56.533513417, 25))[0])
    # Sketch21 → Cut-Extrude15 (cut, up to the picked face)
    with BuildSketch(Plane(origin=(0, 0, -25), x_dir=(-1, 0, 0), z_dir=(0, 0, -1)), mode=Mode.PRIVATE) as cut_extrude15_sk1:
        with Locations((97.386918553, 75)):
            Circle(SKETCH21_R)
    cut_extrude15_tool1 = split(extrude(cut_extrude15_sk1.sketch, amount=-CUT_EXTRUDE15_REACH, mode=Mode.PRIVATE), bisect_by=cut_extrude15_end, keep=Keep.BOTH, mode=Mode.PRIVATE)
    # Sketch21 → Cut-Extrude15 (cut, up to the picked face)
    with BuildSketch(Plane(origin=(0, 0, -25), x_dir=(-1, 0, 0), z_dir=(0, 0, -1)), mode=Mode.PRIVATE) as cut_extrude15_sk2:
        with Locations((97.386918553, 66)):
            Circle(SKETCH21_R)
    cut_extrude15_tool2 = split(extrude(cut_extrude15_sk2.sketch, amount=-CUT_EXTRUDE15_REACH, mode=Mode.PRIVATE), bisect_by=cut_extrude15_end, keep=Keep.BOTH, mode=Mode.PRIVATE)
    add(cut_extrude15_tool1.solids().sort_by(Axis((-97.386919, 75, -25), (0, 0, 1)))[0], mode=Mode.SUBTRACT)
    add(cut_extrude15_tool2.solids().sort_by(Axis((-97.386919, 66, -25), (0, 0, 1)))[0], mode=Mode.SUBTRACT)

    # Sketch22 → Boss-Extrude11 (add)
    with SkipClean():  # the faces are left unmerged after this step: merging them gives an invalid solid
        with BuildSketch(Plane(origin=(0, 80, 0), x_dir=(1, 0, 0), z_dir=(0, 1, 0))):
            with Locations((-90.386918553, 23)):
                Rectangle(SKETCH22_W, SKETCH22_H)
            with Locations((-90.386918553, -23)):
                Rectangle(SKETCH22_W, SKETCH22_H)
        extrude(amount=BOSS_EXTRUDE11_DEPTH)

    # Sketch25 → Cut-Extrude16 (cut)
    with SkipClean():  # the faces are left unmerged after this step: merging them gives an invalid solid
        with BuildSketch(Plane.XZ):
            with Locations(Location((-40, 17.5, 0), (0, 0, 270))):
                Circle(SKETCH25_R)
            with Locations(Location((-40, -17.5, 0), (0, 0, 270))):
                Circle(SKETCH25_R)
        extrude(amount=-CUT_EXTRUDE16_DEPTH, mode=Mode.SUBTRACT)


solid = part.part
